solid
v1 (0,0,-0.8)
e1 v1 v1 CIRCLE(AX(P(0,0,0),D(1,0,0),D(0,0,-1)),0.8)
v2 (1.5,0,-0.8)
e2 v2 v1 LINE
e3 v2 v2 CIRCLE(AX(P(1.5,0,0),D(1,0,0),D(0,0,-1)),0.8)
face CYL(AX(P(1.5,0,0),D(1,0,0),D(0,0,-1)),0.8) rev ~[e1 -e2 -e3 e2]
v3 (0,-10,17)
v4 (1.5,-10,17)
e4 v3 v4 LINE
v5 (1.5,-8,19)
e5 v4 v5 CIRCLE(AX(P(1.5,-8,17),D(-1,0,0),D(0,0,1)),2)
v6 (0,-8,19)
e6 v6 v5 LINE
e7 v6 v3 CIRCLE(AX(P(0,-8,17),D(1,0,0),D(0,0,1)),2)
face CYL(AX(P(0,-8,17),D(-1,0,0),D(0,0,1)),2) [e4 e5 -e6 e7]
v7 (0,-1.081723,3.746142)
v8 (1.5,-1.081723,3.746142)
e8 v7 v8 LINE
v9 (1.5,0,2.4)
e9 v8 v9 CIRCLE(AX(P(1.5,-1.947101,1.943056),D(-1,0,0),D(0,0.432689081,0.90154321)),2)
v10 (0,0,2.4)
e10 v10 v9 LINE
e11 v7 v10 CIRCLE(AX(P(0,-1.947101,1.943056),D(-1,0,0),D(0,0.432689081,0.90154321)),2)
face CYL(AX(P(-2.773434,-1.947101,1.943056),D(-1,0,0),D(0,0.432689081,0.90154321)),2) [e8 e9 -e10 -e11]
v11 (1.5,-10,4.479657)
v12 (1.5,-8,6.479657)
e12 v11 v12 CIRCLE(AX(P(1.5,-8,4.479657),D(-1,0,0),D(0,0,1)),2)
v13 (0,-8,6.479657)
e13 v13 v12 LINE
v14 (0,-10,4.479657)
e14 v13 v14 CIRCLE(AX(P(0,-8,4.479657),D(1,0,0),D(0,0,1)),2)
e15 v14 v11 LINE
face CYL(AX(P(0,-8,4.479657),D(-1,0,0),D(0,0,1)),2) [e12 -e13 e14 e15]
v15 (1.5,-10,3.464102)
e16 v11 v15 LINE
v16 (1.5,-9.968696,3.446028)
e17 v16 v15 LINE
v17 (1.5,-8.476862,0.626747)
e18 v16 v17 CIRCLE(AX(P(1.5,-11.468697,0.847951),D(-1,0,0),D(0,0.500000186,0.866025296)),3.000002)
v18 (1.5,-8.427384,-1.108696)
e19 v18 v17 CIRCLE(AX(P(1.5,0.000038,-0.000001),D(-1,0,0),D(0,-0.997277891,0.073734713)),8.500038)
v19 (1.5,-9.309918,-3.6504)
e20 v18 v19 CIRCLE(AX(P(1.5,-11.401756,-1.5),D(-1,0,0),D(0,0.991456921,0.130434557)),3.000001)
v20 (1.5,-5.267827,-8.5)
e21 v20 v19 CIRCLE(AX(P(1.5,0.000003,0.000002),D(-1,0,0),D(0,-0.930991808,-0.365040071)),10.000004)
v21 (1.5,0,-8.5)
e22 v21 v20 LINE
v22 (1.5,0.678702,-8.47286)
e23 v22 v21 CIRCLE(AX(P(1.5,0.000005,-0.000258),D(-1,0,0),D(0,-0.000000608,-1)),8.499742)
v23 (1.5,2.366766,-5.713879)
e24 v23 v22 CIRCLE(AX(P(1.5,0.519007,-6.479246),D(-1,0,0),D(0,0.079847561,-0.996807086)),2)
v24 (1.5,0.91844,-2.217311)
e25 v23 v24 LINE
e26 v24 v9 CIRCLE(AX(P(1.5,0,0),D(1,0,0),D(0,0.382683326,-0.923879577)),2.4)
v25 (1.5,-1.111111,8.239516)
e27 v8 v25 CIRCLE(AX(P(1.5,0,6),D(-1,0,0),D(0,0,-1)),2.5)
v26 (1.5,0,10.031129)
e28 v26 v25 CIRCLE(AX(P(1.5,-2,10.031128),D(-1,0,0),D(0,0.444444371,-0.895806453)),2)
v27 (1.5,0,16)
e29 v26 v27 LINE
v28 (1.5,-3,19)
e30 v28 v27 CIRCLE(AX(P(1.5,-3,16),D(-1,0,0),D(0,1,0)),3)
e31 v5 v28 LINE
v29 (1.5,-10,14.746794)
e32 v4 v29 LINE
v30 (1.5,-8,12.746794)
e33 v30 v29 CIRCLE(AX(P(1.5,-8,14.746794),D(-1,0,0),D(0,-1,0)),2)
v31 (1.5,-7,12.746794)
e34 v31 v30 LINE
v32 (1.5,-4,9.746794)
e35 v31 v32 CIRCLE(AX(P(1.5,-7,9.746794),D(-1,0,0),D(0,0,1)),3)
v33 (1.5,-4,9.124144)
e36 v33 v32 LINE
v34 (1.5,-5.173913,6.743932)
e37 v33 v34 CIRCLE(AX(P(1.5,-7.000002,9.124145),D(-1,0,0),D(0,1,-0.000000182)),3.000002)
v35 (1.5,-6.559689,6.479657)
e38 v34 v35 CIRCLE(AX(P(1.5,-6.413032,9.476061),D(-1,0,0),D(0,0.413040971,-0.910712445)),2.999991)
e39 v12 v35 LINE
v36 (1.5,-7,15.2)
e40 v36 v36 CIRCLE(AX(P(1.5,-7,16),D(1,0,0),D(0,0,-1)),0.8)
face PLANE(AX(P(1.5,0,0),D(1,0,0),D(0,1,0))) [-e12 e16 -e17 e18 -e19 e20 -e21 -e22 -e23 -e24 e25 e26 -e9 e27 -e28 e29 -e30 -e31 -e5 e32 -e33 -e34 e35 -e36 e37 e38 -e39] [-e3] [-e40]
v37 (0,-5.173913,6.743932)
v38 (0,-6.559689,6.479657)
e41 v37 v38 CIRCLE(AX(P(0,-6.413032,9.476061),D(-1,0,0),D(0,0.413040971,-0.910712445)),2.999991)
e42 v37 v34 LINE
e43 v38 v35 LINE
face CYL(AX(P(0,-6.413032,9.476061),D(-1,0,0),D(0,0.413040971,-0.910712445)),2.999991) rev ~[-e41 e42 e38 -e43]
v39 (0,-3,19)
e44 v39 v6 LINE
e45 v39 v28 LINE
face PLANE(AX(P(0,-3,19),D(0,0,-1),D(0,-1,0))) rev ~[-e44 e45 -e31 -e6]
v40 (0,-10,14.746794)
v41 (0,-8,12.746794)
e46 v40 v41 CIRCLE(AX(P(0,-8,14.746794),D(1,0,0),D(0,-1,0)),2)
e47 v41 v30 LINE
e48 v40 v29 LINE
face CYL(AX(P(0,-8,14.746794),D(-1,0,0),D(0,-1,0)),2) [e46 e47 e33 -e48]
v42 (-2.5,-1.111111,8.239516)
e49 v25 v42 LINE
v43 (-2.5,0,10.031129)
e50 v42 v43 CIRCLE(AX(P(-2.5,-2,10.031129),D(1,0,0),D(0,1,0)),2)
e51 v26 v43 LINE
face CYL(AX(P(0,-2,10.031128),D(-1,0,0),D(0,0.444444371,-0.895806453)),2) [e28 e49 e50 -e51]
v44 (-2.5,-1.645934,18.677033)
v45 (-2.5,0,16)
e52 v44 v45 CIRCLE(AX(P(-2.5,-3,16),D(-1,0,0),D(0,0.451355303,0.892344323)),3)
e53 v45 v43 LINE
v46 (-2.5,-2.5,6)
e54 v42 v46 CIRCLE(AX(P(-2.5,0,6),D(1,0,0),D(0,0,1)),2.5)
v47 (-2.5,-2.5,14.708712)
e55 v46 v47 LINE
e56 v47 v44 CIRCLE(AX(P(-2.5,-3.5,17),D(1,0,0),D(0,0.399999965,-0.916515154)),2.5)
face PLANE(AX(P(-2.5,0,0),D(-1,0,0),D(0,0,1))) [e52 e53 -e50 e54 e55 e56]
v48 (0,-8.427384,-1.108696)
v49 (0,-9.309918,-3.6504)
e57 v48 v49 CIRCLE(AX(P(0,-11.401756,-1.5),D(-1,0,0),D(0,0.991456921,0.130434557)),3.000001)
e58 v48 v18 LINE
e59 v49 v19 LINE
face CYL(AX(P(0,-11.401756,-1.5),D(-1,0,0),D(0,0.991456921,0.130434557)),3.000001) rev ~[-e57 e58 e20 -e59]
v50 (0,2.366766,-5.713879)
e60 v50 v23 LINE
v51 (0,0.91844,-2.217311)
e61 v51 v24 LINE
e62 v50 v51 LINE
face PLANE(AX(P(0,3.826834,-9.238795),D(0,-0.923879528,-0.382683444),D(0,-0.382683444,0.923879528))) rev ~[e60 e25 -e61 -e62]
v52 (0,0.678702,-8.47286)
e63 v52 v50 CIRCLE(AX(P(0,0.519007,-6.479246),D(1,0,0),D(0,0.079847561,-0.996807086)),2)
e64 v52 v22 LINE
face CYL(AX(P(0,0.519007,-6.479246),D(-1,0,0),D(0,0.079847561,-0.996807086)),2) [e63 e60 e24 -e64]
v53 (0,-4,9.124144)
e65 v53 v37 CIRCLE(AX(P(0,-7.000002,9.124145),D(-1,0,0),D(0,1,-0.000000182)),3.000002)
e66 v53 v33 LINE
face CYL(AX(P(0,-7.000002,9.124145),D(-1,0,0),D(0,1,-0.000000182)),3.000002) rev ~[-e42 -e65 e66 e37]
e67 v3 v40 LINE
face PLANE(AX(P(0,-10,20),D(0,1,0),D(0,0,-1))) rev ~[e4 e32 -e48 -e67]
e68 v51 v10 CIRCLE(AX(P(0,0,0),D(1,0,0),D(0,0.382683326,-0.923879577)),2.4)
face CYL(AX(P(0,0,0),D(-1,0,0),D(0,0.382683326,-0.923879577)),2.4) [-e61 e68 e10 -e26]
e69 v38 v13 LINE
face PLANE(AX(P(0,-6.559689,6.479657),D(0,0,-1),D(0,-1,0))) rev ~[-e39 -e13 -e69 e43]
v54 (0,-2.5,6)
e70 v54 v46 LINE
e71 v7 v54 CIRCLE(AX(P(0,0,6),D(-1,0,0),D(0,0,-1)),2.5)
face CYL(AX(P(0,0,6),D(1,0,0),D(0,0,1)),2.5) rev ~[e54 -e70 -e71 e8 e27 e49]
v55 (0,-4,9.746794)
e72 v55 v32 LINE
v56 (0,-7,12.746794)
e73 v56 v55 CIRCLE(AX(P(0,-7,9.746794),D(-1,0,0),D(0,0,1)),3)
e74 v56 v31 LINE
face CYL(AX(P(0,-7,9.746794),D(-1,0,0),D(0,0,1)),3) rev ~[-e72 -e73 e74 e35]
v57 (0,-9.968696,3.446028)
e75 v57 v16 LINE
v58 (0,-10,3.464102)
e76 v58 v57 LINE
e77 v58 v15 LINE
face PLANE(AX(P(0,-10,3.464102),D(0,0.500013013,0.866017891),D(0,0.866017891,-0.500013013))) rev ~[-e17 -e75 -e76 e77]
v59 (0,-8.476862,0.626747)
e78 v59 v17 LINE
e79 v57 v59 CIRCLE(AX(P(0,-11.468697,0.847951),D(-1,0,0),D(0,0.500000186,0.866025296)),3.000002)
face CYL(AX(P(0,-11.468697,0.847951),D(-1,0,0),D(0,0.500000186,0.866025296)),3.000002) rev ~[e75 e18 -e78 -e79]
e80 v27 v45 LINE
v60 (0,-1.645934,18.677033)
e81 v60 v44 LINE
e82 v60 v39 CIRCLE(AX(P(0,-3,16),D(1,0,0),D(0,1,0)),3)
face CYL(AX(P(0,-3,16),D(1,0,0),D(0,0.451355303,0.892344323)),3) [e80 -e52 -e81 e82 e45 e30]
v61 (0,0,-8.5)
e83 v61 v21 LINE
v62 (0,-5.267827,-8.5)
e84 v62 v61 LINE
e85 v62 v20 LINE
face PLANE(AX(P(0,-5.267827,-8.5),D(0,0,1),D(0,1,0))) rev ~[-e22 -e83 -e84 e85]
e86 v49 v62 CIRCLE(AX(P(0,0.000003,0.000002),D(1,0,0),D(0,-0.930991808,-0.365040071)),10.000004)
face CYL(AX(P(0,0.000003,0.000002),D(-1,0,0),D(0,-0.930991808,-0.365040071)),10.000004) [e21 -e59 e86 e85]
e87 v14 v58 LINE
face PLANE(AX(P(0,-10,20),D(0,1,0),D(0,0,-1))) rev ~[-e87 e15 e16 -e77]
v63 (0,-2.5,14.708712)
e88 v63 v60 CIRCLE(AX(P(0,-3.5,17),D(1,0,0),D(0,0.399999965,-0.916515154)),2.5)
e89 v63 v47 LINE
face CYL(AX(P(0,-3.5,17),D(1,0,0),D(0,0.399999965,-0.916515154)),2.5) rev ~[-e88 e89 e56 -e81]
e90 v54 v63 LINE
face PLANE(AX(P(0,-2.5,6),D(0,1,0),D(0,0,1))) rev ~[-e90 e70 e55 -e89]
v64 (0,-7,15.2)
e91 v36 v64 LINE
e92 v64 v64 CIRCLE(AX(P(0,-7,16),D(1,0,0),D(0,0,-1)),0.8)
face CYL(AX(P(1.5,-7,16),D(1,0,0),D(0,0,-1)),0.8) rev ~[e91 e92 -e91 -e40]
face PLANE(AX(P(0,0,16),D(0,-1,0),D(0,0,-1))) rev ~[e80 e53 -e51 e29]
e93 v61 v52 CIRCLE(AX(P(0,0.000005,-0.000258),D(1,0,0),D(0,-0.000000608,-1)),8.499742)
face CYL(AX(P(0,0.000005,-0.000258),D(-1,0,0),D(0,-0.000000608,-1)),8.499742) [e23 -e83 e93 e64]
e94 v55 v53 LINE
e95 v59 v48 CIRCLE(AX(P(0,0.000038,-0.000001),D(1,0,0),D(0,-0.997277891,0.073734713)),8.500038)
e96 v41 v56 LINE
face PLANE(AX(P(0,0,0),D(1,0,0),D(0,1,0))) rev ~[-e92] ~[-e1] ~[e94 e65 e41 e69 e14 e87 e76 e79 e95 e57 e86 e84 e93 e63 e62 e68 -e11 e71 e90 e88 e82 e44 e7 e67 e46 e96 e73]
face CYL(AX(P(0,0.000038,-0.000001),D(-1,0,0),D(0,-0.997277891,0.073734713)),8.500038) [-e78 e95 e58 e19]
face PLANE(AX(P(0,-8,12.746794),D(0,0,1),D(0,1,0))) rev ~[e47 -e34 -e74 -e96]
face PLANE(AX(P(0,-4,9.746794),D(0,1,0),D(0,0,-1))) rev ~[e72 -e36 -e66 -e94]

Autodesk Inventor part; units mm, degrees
ref_plane "YZ Plane" through (0, 0, 0) normal (1, 0, 0) x (0, 1, 0)
ref_plane "XZ Plane" through (0, 0, 0) normal (0, 1, 0) x (-1, 0, 0)
ref_plane "XY Plane" through (0, 0, 0) normal (0, 0, 1) x (1, 0, 0)
sketch "スケッチ1" plane through (0, 0, 0) normal (1, 0, 0) x (0, 1, 0)
  circle A0 centre (0, 0) radius 6 construction
  circle A1 centre (6, 0) radius 0.8
  line L0 (-14, 0) -> (14, 0)
  circle A2 centre (4.242641, 4.242641) radius 0.8
  circle A3 centre (0, 6) radius 0.8
  circle A4 centre (-4.242641, 4.242641) radius 0.8
  circle A5 centre (-6, 0) radius 0.8
  circle A6 centre (-4.242641, -4.242641) radius 0.8
  circle A7 centre (0, -6) radius 0.8
  circle A8 centre (4.242641, -4.242641) radius 0.8
  circle A9 centre (0, 0) radius 2.4
  line L1 (0, 0) -> (0, 6)
  line L2 (0, 0) -> (2.296101, -5.543277)
  circle A10 centre (0, 0) radius 10
  line L3 (2.296101, -5.543277) -> (3.826834, -9.238795)
  line L4 (0, -9.238795) -> (-10, -9.238795)
  line L5 (-10, -9.238795) -> (-10, 20)
  line L6 (-10, 20) -> (0, 20)
  line L7 (0, 20) -> (0, -9.238795)
  line L8 (0, -6) -> (4.242641, -4.242641) construction
  line L9 (0, -9.238795) -> (3.826834, -9.238795)
  circle A11 centre (0, 6) radius 2.5
  point P0 (0, 5.2)
  point P1 (0, 6.8)
  point P2 (-10, 0)
  point P3 (2.12132, -5.12132)
  point P4 (0, 2.4)
  point P5 (0.91844, -2.217311)
  point P6 (0, 8.5)
  point P7 (0, 10)
  point P8 (0, 3.5)
  point P9 (-3.826834, -9.238795)
  point P10 (0, -6.8)
  point P11 (0, -5.2)
  point P12 (0, -2.4)
  dimension "d1" = 12
  dimension "d2" = 1.6
  dimension "d5" = 360
  dimension "d7" = 4.8
  dimension "d8" = 4
  dimension "d21" = 5
  dimension "d23" = 20
sketch "スケッチ1 outline for 押し出し1" plane through (0, 0, 0) normal (1, 0, 0) x (0, 1, 0)
  arc A0 (0.91844, -2.217311) -> (0, 2.4) centre (0, 0) ccw
  line L0 (0, 2.4) -> (0, 3.5)
  arc A1 (0, 3.5) -> (0, 8.5) centre (0, 6) cw
  line L1 (0, 8.5) -> (0, 20)
  line L2 (0, 20) -> (-10, 20)
  line L3 (-10, 20) -> (-10, -9.238795)
  line L4 (-10, -9.238795) -> (3.826834, -9.238795)
  line L5 (3.826834, -9.238795) -> (0.91844, -2.217311)
extrude "押し出し1" add sketch "スケッチ1 outline for 押し出し1" along normal blind 1.5
sketch "スケッチ6" plane through (0, 0, 0) normal (-1, 0, 0) x (0, 0, 1)
  line L0 (12.746794, -7) -> (12.746794, -8)
  line L1 (17, -10) -> (14.746794, -10)
  line L2 (19, -8) -> (19, -3)
  arc A0 (19, -3) -> (16, 0) centre (16, -3) ccw
  line L3 (10.031129, 0) -> (16, 0)
  arc A1 (3.630208, 0.796296) -> (8.239516, -1.111111) centre (6, 0) ccw
  arc A2 (3.276042, 2.707407) -> (-3.926488, 1.626405) centre (0, 0) ccw
  line L4 (-5.713879, 2.366766) -> (-3.926488, 1.626405)
  arc A3 (-8.47286, 0.678702) -> (-8.5, 0) centre (0, 0) ccw
  line L5 (-8.5, 0) -> (-8.5, -5.267827)
  arc A4 (-8.5, -5.267827) -> (-3.6504, -9.309918) centre (0, 0) ccw
  arc A5 (-1.108696, -8.427384) -> (-3.6504, -9.309918) centre (-1.5, -11.401754) ccw
  arc A6 (-1.108696, -8.427384) -> (0.626747, -8.476862) centre (0, 0) ccw
  arc A7 (3.446028, -9.968696) -> (0.626747, -8.476862) centre (0.847952, -11.468696) ccw
  line L6 (3.446028, -9.968696) -> (3.464102, -10)
  line L7 (4.479657, -10) -> (3.464102, -10)
  line L8 (6.479657, -8) -> (6.479657, -6.559689)
  arc A8 (6.743932, -5.173913) -> (6.479657, -6.559689) centre (9.47607, -6.413035) ccw
  arc A9 (9.124144, -4) -> (6.743932, -5.173913) centre (9.124144, -7) ccw
  line L9 (9.124144, -4) -> (9.746794, -4)
  arc A10 (12.746794, -7) -> (9.746794, -4) centre (9.746794, -7) ccw
  circle A11 centre (17, -3.5) radius 0.8
  circle A12 centre (-6, 0) radius 0.8
  circle A13 centre (-4.242641, -4.242641) radius 0.8
  circle A14 centre (4.242641, -4.242641) radius 0.8
  circle A15 centre (0, -6) radius 0.8
  arc A16 (2.4, 0) -> (-2.217311, 0.91844) centre (0, 0) ccw
  line L10 (-9.238795, 3.826834) -> (-2.217311, 0.91844)
  line L11 (-9.238795, -10) -> (-9.238795, 3.826834)
  line L12 (20, -10) -> (-9.238795, -10)
  line L13 (20, 0) -> (20, -10)
  line L14 (8.5, 0) -> (20, 0)
  arc A17 (3.5, 0) -> (8.5, 0) centre (6, 0) ccw
  line L15 (2.4, 0) -> (3.5, 0)
  circle A18 centre (16, -7) radius 0.8
  circle A19 centre (0, 0) radius 0.8
  arc A20 (3.630208, 0.796296) -> (3.276042, 2.707407) centre (1.734375, 1.433333) ccw
  arc A21 (-5.713879, 2.366766) -> (-8.47286, 0.678702) centre (-6.479246, 0.519007) ccw
  arc A22 (4.479657, -10) -> (6.479657, -8) centre (4.479657, -8) ccw
  arc A23 (12.746794, -8) -> (14.746794, -10) centre (14.746794, -8) ccw
  arc A24 (17, -10) -> (19, -8) centre (17, -8) ccw
  arc A25 (10.031129, 0) -> (8.239516, -1.111111) centre (10.031129, -2) ccw
  point P0 (-7.852976, 3.252809)
  point P1 (6.479657, -10)
  point P2 (12.746794, -10)
  point P3 (16, 0)
  point P4 (19, -10)
  point P5 (-3.926488, 1.626405)
  point P6 (8.239516, -1.111111)
  point P7 (-3.926488, 1.626405)
  point P8 (16, 0)
sketch "スケッチ6 outline for 押し出し5" plane through (0, 0, 0) normal (-1, 0, 0) x (0, 0, 1)
  arc A0 (8.5, 0) -> (8.239516, -1.111111) centre (6, 0) cw
  line L0 (10.031129, 0) -> (8.5, 0)
  arc A1 (8.239516, -1.111111) -> (10.031129, 0) centre (10.031129, -2) cw
  line L1 (12.746794, -8) -> (12.746794, -7)
  arc A2 (14.746794, -10) -> (12.746794, -8) centre (14.746794, -8) cw
  line L2 (4.479657, -10) -> (14.746794, -10)
  arc A3 (6.479657, -8) -> (4.479657, -10) centre (4.479657, -8) cw
  line L3 (6.479657, -6.559689) -> (6.479657, -8)
  arc A4 (6.743932, -5.173913) -> (6.479657, -6.559689) centre (9.47607, -6.413035) ccw
  arc A5 (9.124144, -4) -> (6.743932, -5.173913) centre (9.124144, -7) ccw
  line L4 (9.746794, -4) -> (9.124144, -4)
  arc A6 (12.746794, -7) -> (9.746794, -4) centre (9.746794, -7) ccw
  line L5 (19, -3) -> (19, -8)
  arc A7 (16, 0) -> (19, -3) centre (16, -3) cw
  line L6 (20, 0) -> (16, 0)
  line L7 (20, -10) -> (20, 0)
  line L8 (17, -10) -> (20, -10)
  arc A8 (19, -8) -> (17, -10) centre (17, -8) cw
  arc A9 (-8.5, 0) -> (-8.47286, 0.678702) centre (0, 0) cw
  line L9 (-8.5, -5.267827) -> (-8.5, 0)
  arc A10 (-3.6504, -9.309918) -> (-8.5, -5.267827) centre (0, 0) cw
  arc A11 (-1.108696, -8.427384) -> (-3.6504, -9.309918) centre (-1.5, -11.401754) ccw
  arc A12 (0.626747, -8.476862) -> (-1.108696, -8.427384) centre (0, 0) cw
  arc A13 (3.446028, -9.968696) -> (0.626747, -8.476862) centre (0.847952, -11.468696) ccw
  line L10 (3.464102, -10) -> (3.446028, -9.968696)
  line L11 (-9.238795, -10) -> (3.464102, -10)
  line L12 (-9.238795, 3.826834) -> (-9.238795, -10)
  line L13 (-5.713879, 2.366766) -> (-9.238795, 3.826834)
  arc A14 (-8.47286, 0.678702) -> (-5.713879, 2.366766) centre (-6.479246, 0.519007) cw
extrude "押し出し5" cut sketch "スケッチ6 outline for 押し出し5" against normal through all
sketch "スケッチ7" plane through (0, 0, 0) normal (-1, 0, 0) x (0, 0, 1)
  line L0 (14.5, -3.5) -> (6.629791, -3.5)
  arc A0 (-7.852976, 3.252809) -> (-8.5, 0) centre (0, 0) ccw
  line L1 (-8.5, 0) -> (-8.5, -5.267827)
  arc A1 (-8.5, -5.267827) -> (-3.6504, -9.309918) centre (0, 0) ccw
  arc A2 (-1.108696, -8.427384) -> (-3.6504, -9.309918) centre (-1.5, -11.401754) ccw
  arc A3 (-1.108696, -8.427384) -> (0.626747, -8.476862) centre (0, 0) ccw
  arc A4 (3.446028, -9.968696) -> (0.626747, -8.476862) centre (0.847952, -11.468696) ccw
  line L2 (3.446028, -9.968696) -> (3.464102, -10)
  line L3 (6.479657, -10) -> (3.464102, -10)
  line L4 (6.479657, -10) -> (6.479657, -6.559689)
  arc A5 (6.743932, -5.173913) -> (6.479657, -6.559689) centre (9.47607, -6.413035) ccw
  arc A6 (9.124144, -4) -> (6.743932, -5.173913) centre (9.124144, -7) ccw
  line L5 (9.124144, -4) -> (9.746794, -4)
  arc A7 (12.746794, -7) -> (9.746794, -4) centre (9.746794, -7) ccw
  line L6 (12.746794, -7) -> (12.746794, -10)
  line L7 (19, -10) -> (12.746794, -10)
  line L8 (19, -10) -> (19, -3)
  arc A8 (19, -3) -> (16, 0) centre (16, -3) ccw
  line L9 (8.5, 0) -> (16, 0)
  arc A9 (3.5, 0) -> (8.5, 0) centre (6, 0) ccw
  line L10 (2.4, 0) -> (3.5, 0)
  arc A10 (2.4, 0) -> (-2.217311, 0.91844) centre (0, 0) ccw
  line L11 (-7.852976, 3.252809) -> (-2.217311, 0.91844)
  circle A11 centre (17, -3.5) radius 0.8
  circle A12 centre (17, -3.5) radius 2.5
  line L12 (6.629791, -3.5) -> (0, -3.5)
  circle A13 centre (0, 0) radius 3.5
  line L13 (3.5, 0) -> (3.5, -3.5)
  line L14 (0, -3.5) -> (14.708712, -3.5)
  line L15 (14.708712, -3.5) -> (14.708712, -2.5)
  line L16 (14.708712, -2.5) -> (0, -2.5)
  line L17 (0, -2.5) -> (0, -3.5)
  point P0 (18.677033, -1.645934)
  point P1 (6, -2.5)
  dimension "d31" = 5
  dimension "d34" = 1
sketch "スケッチ7 outline for 押し出し6" plane through (0, 0, 0) normal (-1, 0, 0) x (0, 0, 1)
  line L0 (16, 0) -> (8.5, 0)
  arc A0 (18.677033, -1.645934) -> (16, 0) centre (16, -3) ccw
  arc A1 (14.708712, -2.5) -> (18.677033, -1.645934) centre (17, -3.5) cw
  line L1 (6, -2.5) -> (14.708712, -2.5)
  arc A2 (8.5, 0) -> (6, -2.5) centre (6, 0) cw
extrude "押し出し6" add sketch "スケッチ7 outline for 押し出し6" along normal blind 2.5
sketch "スケッチ8" plane through (1.5, 0, 0) normal (1, 0, 0) x (0, 0, -1)
  circle A0 centre (-16, -7) radius 0.8
  line L0 (-17, -10) -> (-14.746794, -10)
  line L1 (-19, -3) -> (-19, -8)
  circle A1 centre (0, 0) radius 0.8
  point P0 (-19, -10)
  point P1 (-12.746794, -10)
  dimension "d35" = 1.6
  dimension "d36" = 3
  dimension "d37" = 3
  dimension "d40" = 1.6
sketch "スケッチ8 outline for 押し出し7" plane through (1.5, 0, 0) normal (1, 0, 0) x (0, 0, -1)
  circle A0 centre (-16, -7) radius 0.8
  circle A1 centre (0, 0) radius 0.8
extrude "押し出し7" cut sketch "スケッチ8 outline for 押し出し7" against normal through all
fillet "フィレット1" radius 2 2 edges at (0.75, 0, 3.5) (-1.25, 0, 8.5)
properties part number "toe_springjoint_cover_under_left"
